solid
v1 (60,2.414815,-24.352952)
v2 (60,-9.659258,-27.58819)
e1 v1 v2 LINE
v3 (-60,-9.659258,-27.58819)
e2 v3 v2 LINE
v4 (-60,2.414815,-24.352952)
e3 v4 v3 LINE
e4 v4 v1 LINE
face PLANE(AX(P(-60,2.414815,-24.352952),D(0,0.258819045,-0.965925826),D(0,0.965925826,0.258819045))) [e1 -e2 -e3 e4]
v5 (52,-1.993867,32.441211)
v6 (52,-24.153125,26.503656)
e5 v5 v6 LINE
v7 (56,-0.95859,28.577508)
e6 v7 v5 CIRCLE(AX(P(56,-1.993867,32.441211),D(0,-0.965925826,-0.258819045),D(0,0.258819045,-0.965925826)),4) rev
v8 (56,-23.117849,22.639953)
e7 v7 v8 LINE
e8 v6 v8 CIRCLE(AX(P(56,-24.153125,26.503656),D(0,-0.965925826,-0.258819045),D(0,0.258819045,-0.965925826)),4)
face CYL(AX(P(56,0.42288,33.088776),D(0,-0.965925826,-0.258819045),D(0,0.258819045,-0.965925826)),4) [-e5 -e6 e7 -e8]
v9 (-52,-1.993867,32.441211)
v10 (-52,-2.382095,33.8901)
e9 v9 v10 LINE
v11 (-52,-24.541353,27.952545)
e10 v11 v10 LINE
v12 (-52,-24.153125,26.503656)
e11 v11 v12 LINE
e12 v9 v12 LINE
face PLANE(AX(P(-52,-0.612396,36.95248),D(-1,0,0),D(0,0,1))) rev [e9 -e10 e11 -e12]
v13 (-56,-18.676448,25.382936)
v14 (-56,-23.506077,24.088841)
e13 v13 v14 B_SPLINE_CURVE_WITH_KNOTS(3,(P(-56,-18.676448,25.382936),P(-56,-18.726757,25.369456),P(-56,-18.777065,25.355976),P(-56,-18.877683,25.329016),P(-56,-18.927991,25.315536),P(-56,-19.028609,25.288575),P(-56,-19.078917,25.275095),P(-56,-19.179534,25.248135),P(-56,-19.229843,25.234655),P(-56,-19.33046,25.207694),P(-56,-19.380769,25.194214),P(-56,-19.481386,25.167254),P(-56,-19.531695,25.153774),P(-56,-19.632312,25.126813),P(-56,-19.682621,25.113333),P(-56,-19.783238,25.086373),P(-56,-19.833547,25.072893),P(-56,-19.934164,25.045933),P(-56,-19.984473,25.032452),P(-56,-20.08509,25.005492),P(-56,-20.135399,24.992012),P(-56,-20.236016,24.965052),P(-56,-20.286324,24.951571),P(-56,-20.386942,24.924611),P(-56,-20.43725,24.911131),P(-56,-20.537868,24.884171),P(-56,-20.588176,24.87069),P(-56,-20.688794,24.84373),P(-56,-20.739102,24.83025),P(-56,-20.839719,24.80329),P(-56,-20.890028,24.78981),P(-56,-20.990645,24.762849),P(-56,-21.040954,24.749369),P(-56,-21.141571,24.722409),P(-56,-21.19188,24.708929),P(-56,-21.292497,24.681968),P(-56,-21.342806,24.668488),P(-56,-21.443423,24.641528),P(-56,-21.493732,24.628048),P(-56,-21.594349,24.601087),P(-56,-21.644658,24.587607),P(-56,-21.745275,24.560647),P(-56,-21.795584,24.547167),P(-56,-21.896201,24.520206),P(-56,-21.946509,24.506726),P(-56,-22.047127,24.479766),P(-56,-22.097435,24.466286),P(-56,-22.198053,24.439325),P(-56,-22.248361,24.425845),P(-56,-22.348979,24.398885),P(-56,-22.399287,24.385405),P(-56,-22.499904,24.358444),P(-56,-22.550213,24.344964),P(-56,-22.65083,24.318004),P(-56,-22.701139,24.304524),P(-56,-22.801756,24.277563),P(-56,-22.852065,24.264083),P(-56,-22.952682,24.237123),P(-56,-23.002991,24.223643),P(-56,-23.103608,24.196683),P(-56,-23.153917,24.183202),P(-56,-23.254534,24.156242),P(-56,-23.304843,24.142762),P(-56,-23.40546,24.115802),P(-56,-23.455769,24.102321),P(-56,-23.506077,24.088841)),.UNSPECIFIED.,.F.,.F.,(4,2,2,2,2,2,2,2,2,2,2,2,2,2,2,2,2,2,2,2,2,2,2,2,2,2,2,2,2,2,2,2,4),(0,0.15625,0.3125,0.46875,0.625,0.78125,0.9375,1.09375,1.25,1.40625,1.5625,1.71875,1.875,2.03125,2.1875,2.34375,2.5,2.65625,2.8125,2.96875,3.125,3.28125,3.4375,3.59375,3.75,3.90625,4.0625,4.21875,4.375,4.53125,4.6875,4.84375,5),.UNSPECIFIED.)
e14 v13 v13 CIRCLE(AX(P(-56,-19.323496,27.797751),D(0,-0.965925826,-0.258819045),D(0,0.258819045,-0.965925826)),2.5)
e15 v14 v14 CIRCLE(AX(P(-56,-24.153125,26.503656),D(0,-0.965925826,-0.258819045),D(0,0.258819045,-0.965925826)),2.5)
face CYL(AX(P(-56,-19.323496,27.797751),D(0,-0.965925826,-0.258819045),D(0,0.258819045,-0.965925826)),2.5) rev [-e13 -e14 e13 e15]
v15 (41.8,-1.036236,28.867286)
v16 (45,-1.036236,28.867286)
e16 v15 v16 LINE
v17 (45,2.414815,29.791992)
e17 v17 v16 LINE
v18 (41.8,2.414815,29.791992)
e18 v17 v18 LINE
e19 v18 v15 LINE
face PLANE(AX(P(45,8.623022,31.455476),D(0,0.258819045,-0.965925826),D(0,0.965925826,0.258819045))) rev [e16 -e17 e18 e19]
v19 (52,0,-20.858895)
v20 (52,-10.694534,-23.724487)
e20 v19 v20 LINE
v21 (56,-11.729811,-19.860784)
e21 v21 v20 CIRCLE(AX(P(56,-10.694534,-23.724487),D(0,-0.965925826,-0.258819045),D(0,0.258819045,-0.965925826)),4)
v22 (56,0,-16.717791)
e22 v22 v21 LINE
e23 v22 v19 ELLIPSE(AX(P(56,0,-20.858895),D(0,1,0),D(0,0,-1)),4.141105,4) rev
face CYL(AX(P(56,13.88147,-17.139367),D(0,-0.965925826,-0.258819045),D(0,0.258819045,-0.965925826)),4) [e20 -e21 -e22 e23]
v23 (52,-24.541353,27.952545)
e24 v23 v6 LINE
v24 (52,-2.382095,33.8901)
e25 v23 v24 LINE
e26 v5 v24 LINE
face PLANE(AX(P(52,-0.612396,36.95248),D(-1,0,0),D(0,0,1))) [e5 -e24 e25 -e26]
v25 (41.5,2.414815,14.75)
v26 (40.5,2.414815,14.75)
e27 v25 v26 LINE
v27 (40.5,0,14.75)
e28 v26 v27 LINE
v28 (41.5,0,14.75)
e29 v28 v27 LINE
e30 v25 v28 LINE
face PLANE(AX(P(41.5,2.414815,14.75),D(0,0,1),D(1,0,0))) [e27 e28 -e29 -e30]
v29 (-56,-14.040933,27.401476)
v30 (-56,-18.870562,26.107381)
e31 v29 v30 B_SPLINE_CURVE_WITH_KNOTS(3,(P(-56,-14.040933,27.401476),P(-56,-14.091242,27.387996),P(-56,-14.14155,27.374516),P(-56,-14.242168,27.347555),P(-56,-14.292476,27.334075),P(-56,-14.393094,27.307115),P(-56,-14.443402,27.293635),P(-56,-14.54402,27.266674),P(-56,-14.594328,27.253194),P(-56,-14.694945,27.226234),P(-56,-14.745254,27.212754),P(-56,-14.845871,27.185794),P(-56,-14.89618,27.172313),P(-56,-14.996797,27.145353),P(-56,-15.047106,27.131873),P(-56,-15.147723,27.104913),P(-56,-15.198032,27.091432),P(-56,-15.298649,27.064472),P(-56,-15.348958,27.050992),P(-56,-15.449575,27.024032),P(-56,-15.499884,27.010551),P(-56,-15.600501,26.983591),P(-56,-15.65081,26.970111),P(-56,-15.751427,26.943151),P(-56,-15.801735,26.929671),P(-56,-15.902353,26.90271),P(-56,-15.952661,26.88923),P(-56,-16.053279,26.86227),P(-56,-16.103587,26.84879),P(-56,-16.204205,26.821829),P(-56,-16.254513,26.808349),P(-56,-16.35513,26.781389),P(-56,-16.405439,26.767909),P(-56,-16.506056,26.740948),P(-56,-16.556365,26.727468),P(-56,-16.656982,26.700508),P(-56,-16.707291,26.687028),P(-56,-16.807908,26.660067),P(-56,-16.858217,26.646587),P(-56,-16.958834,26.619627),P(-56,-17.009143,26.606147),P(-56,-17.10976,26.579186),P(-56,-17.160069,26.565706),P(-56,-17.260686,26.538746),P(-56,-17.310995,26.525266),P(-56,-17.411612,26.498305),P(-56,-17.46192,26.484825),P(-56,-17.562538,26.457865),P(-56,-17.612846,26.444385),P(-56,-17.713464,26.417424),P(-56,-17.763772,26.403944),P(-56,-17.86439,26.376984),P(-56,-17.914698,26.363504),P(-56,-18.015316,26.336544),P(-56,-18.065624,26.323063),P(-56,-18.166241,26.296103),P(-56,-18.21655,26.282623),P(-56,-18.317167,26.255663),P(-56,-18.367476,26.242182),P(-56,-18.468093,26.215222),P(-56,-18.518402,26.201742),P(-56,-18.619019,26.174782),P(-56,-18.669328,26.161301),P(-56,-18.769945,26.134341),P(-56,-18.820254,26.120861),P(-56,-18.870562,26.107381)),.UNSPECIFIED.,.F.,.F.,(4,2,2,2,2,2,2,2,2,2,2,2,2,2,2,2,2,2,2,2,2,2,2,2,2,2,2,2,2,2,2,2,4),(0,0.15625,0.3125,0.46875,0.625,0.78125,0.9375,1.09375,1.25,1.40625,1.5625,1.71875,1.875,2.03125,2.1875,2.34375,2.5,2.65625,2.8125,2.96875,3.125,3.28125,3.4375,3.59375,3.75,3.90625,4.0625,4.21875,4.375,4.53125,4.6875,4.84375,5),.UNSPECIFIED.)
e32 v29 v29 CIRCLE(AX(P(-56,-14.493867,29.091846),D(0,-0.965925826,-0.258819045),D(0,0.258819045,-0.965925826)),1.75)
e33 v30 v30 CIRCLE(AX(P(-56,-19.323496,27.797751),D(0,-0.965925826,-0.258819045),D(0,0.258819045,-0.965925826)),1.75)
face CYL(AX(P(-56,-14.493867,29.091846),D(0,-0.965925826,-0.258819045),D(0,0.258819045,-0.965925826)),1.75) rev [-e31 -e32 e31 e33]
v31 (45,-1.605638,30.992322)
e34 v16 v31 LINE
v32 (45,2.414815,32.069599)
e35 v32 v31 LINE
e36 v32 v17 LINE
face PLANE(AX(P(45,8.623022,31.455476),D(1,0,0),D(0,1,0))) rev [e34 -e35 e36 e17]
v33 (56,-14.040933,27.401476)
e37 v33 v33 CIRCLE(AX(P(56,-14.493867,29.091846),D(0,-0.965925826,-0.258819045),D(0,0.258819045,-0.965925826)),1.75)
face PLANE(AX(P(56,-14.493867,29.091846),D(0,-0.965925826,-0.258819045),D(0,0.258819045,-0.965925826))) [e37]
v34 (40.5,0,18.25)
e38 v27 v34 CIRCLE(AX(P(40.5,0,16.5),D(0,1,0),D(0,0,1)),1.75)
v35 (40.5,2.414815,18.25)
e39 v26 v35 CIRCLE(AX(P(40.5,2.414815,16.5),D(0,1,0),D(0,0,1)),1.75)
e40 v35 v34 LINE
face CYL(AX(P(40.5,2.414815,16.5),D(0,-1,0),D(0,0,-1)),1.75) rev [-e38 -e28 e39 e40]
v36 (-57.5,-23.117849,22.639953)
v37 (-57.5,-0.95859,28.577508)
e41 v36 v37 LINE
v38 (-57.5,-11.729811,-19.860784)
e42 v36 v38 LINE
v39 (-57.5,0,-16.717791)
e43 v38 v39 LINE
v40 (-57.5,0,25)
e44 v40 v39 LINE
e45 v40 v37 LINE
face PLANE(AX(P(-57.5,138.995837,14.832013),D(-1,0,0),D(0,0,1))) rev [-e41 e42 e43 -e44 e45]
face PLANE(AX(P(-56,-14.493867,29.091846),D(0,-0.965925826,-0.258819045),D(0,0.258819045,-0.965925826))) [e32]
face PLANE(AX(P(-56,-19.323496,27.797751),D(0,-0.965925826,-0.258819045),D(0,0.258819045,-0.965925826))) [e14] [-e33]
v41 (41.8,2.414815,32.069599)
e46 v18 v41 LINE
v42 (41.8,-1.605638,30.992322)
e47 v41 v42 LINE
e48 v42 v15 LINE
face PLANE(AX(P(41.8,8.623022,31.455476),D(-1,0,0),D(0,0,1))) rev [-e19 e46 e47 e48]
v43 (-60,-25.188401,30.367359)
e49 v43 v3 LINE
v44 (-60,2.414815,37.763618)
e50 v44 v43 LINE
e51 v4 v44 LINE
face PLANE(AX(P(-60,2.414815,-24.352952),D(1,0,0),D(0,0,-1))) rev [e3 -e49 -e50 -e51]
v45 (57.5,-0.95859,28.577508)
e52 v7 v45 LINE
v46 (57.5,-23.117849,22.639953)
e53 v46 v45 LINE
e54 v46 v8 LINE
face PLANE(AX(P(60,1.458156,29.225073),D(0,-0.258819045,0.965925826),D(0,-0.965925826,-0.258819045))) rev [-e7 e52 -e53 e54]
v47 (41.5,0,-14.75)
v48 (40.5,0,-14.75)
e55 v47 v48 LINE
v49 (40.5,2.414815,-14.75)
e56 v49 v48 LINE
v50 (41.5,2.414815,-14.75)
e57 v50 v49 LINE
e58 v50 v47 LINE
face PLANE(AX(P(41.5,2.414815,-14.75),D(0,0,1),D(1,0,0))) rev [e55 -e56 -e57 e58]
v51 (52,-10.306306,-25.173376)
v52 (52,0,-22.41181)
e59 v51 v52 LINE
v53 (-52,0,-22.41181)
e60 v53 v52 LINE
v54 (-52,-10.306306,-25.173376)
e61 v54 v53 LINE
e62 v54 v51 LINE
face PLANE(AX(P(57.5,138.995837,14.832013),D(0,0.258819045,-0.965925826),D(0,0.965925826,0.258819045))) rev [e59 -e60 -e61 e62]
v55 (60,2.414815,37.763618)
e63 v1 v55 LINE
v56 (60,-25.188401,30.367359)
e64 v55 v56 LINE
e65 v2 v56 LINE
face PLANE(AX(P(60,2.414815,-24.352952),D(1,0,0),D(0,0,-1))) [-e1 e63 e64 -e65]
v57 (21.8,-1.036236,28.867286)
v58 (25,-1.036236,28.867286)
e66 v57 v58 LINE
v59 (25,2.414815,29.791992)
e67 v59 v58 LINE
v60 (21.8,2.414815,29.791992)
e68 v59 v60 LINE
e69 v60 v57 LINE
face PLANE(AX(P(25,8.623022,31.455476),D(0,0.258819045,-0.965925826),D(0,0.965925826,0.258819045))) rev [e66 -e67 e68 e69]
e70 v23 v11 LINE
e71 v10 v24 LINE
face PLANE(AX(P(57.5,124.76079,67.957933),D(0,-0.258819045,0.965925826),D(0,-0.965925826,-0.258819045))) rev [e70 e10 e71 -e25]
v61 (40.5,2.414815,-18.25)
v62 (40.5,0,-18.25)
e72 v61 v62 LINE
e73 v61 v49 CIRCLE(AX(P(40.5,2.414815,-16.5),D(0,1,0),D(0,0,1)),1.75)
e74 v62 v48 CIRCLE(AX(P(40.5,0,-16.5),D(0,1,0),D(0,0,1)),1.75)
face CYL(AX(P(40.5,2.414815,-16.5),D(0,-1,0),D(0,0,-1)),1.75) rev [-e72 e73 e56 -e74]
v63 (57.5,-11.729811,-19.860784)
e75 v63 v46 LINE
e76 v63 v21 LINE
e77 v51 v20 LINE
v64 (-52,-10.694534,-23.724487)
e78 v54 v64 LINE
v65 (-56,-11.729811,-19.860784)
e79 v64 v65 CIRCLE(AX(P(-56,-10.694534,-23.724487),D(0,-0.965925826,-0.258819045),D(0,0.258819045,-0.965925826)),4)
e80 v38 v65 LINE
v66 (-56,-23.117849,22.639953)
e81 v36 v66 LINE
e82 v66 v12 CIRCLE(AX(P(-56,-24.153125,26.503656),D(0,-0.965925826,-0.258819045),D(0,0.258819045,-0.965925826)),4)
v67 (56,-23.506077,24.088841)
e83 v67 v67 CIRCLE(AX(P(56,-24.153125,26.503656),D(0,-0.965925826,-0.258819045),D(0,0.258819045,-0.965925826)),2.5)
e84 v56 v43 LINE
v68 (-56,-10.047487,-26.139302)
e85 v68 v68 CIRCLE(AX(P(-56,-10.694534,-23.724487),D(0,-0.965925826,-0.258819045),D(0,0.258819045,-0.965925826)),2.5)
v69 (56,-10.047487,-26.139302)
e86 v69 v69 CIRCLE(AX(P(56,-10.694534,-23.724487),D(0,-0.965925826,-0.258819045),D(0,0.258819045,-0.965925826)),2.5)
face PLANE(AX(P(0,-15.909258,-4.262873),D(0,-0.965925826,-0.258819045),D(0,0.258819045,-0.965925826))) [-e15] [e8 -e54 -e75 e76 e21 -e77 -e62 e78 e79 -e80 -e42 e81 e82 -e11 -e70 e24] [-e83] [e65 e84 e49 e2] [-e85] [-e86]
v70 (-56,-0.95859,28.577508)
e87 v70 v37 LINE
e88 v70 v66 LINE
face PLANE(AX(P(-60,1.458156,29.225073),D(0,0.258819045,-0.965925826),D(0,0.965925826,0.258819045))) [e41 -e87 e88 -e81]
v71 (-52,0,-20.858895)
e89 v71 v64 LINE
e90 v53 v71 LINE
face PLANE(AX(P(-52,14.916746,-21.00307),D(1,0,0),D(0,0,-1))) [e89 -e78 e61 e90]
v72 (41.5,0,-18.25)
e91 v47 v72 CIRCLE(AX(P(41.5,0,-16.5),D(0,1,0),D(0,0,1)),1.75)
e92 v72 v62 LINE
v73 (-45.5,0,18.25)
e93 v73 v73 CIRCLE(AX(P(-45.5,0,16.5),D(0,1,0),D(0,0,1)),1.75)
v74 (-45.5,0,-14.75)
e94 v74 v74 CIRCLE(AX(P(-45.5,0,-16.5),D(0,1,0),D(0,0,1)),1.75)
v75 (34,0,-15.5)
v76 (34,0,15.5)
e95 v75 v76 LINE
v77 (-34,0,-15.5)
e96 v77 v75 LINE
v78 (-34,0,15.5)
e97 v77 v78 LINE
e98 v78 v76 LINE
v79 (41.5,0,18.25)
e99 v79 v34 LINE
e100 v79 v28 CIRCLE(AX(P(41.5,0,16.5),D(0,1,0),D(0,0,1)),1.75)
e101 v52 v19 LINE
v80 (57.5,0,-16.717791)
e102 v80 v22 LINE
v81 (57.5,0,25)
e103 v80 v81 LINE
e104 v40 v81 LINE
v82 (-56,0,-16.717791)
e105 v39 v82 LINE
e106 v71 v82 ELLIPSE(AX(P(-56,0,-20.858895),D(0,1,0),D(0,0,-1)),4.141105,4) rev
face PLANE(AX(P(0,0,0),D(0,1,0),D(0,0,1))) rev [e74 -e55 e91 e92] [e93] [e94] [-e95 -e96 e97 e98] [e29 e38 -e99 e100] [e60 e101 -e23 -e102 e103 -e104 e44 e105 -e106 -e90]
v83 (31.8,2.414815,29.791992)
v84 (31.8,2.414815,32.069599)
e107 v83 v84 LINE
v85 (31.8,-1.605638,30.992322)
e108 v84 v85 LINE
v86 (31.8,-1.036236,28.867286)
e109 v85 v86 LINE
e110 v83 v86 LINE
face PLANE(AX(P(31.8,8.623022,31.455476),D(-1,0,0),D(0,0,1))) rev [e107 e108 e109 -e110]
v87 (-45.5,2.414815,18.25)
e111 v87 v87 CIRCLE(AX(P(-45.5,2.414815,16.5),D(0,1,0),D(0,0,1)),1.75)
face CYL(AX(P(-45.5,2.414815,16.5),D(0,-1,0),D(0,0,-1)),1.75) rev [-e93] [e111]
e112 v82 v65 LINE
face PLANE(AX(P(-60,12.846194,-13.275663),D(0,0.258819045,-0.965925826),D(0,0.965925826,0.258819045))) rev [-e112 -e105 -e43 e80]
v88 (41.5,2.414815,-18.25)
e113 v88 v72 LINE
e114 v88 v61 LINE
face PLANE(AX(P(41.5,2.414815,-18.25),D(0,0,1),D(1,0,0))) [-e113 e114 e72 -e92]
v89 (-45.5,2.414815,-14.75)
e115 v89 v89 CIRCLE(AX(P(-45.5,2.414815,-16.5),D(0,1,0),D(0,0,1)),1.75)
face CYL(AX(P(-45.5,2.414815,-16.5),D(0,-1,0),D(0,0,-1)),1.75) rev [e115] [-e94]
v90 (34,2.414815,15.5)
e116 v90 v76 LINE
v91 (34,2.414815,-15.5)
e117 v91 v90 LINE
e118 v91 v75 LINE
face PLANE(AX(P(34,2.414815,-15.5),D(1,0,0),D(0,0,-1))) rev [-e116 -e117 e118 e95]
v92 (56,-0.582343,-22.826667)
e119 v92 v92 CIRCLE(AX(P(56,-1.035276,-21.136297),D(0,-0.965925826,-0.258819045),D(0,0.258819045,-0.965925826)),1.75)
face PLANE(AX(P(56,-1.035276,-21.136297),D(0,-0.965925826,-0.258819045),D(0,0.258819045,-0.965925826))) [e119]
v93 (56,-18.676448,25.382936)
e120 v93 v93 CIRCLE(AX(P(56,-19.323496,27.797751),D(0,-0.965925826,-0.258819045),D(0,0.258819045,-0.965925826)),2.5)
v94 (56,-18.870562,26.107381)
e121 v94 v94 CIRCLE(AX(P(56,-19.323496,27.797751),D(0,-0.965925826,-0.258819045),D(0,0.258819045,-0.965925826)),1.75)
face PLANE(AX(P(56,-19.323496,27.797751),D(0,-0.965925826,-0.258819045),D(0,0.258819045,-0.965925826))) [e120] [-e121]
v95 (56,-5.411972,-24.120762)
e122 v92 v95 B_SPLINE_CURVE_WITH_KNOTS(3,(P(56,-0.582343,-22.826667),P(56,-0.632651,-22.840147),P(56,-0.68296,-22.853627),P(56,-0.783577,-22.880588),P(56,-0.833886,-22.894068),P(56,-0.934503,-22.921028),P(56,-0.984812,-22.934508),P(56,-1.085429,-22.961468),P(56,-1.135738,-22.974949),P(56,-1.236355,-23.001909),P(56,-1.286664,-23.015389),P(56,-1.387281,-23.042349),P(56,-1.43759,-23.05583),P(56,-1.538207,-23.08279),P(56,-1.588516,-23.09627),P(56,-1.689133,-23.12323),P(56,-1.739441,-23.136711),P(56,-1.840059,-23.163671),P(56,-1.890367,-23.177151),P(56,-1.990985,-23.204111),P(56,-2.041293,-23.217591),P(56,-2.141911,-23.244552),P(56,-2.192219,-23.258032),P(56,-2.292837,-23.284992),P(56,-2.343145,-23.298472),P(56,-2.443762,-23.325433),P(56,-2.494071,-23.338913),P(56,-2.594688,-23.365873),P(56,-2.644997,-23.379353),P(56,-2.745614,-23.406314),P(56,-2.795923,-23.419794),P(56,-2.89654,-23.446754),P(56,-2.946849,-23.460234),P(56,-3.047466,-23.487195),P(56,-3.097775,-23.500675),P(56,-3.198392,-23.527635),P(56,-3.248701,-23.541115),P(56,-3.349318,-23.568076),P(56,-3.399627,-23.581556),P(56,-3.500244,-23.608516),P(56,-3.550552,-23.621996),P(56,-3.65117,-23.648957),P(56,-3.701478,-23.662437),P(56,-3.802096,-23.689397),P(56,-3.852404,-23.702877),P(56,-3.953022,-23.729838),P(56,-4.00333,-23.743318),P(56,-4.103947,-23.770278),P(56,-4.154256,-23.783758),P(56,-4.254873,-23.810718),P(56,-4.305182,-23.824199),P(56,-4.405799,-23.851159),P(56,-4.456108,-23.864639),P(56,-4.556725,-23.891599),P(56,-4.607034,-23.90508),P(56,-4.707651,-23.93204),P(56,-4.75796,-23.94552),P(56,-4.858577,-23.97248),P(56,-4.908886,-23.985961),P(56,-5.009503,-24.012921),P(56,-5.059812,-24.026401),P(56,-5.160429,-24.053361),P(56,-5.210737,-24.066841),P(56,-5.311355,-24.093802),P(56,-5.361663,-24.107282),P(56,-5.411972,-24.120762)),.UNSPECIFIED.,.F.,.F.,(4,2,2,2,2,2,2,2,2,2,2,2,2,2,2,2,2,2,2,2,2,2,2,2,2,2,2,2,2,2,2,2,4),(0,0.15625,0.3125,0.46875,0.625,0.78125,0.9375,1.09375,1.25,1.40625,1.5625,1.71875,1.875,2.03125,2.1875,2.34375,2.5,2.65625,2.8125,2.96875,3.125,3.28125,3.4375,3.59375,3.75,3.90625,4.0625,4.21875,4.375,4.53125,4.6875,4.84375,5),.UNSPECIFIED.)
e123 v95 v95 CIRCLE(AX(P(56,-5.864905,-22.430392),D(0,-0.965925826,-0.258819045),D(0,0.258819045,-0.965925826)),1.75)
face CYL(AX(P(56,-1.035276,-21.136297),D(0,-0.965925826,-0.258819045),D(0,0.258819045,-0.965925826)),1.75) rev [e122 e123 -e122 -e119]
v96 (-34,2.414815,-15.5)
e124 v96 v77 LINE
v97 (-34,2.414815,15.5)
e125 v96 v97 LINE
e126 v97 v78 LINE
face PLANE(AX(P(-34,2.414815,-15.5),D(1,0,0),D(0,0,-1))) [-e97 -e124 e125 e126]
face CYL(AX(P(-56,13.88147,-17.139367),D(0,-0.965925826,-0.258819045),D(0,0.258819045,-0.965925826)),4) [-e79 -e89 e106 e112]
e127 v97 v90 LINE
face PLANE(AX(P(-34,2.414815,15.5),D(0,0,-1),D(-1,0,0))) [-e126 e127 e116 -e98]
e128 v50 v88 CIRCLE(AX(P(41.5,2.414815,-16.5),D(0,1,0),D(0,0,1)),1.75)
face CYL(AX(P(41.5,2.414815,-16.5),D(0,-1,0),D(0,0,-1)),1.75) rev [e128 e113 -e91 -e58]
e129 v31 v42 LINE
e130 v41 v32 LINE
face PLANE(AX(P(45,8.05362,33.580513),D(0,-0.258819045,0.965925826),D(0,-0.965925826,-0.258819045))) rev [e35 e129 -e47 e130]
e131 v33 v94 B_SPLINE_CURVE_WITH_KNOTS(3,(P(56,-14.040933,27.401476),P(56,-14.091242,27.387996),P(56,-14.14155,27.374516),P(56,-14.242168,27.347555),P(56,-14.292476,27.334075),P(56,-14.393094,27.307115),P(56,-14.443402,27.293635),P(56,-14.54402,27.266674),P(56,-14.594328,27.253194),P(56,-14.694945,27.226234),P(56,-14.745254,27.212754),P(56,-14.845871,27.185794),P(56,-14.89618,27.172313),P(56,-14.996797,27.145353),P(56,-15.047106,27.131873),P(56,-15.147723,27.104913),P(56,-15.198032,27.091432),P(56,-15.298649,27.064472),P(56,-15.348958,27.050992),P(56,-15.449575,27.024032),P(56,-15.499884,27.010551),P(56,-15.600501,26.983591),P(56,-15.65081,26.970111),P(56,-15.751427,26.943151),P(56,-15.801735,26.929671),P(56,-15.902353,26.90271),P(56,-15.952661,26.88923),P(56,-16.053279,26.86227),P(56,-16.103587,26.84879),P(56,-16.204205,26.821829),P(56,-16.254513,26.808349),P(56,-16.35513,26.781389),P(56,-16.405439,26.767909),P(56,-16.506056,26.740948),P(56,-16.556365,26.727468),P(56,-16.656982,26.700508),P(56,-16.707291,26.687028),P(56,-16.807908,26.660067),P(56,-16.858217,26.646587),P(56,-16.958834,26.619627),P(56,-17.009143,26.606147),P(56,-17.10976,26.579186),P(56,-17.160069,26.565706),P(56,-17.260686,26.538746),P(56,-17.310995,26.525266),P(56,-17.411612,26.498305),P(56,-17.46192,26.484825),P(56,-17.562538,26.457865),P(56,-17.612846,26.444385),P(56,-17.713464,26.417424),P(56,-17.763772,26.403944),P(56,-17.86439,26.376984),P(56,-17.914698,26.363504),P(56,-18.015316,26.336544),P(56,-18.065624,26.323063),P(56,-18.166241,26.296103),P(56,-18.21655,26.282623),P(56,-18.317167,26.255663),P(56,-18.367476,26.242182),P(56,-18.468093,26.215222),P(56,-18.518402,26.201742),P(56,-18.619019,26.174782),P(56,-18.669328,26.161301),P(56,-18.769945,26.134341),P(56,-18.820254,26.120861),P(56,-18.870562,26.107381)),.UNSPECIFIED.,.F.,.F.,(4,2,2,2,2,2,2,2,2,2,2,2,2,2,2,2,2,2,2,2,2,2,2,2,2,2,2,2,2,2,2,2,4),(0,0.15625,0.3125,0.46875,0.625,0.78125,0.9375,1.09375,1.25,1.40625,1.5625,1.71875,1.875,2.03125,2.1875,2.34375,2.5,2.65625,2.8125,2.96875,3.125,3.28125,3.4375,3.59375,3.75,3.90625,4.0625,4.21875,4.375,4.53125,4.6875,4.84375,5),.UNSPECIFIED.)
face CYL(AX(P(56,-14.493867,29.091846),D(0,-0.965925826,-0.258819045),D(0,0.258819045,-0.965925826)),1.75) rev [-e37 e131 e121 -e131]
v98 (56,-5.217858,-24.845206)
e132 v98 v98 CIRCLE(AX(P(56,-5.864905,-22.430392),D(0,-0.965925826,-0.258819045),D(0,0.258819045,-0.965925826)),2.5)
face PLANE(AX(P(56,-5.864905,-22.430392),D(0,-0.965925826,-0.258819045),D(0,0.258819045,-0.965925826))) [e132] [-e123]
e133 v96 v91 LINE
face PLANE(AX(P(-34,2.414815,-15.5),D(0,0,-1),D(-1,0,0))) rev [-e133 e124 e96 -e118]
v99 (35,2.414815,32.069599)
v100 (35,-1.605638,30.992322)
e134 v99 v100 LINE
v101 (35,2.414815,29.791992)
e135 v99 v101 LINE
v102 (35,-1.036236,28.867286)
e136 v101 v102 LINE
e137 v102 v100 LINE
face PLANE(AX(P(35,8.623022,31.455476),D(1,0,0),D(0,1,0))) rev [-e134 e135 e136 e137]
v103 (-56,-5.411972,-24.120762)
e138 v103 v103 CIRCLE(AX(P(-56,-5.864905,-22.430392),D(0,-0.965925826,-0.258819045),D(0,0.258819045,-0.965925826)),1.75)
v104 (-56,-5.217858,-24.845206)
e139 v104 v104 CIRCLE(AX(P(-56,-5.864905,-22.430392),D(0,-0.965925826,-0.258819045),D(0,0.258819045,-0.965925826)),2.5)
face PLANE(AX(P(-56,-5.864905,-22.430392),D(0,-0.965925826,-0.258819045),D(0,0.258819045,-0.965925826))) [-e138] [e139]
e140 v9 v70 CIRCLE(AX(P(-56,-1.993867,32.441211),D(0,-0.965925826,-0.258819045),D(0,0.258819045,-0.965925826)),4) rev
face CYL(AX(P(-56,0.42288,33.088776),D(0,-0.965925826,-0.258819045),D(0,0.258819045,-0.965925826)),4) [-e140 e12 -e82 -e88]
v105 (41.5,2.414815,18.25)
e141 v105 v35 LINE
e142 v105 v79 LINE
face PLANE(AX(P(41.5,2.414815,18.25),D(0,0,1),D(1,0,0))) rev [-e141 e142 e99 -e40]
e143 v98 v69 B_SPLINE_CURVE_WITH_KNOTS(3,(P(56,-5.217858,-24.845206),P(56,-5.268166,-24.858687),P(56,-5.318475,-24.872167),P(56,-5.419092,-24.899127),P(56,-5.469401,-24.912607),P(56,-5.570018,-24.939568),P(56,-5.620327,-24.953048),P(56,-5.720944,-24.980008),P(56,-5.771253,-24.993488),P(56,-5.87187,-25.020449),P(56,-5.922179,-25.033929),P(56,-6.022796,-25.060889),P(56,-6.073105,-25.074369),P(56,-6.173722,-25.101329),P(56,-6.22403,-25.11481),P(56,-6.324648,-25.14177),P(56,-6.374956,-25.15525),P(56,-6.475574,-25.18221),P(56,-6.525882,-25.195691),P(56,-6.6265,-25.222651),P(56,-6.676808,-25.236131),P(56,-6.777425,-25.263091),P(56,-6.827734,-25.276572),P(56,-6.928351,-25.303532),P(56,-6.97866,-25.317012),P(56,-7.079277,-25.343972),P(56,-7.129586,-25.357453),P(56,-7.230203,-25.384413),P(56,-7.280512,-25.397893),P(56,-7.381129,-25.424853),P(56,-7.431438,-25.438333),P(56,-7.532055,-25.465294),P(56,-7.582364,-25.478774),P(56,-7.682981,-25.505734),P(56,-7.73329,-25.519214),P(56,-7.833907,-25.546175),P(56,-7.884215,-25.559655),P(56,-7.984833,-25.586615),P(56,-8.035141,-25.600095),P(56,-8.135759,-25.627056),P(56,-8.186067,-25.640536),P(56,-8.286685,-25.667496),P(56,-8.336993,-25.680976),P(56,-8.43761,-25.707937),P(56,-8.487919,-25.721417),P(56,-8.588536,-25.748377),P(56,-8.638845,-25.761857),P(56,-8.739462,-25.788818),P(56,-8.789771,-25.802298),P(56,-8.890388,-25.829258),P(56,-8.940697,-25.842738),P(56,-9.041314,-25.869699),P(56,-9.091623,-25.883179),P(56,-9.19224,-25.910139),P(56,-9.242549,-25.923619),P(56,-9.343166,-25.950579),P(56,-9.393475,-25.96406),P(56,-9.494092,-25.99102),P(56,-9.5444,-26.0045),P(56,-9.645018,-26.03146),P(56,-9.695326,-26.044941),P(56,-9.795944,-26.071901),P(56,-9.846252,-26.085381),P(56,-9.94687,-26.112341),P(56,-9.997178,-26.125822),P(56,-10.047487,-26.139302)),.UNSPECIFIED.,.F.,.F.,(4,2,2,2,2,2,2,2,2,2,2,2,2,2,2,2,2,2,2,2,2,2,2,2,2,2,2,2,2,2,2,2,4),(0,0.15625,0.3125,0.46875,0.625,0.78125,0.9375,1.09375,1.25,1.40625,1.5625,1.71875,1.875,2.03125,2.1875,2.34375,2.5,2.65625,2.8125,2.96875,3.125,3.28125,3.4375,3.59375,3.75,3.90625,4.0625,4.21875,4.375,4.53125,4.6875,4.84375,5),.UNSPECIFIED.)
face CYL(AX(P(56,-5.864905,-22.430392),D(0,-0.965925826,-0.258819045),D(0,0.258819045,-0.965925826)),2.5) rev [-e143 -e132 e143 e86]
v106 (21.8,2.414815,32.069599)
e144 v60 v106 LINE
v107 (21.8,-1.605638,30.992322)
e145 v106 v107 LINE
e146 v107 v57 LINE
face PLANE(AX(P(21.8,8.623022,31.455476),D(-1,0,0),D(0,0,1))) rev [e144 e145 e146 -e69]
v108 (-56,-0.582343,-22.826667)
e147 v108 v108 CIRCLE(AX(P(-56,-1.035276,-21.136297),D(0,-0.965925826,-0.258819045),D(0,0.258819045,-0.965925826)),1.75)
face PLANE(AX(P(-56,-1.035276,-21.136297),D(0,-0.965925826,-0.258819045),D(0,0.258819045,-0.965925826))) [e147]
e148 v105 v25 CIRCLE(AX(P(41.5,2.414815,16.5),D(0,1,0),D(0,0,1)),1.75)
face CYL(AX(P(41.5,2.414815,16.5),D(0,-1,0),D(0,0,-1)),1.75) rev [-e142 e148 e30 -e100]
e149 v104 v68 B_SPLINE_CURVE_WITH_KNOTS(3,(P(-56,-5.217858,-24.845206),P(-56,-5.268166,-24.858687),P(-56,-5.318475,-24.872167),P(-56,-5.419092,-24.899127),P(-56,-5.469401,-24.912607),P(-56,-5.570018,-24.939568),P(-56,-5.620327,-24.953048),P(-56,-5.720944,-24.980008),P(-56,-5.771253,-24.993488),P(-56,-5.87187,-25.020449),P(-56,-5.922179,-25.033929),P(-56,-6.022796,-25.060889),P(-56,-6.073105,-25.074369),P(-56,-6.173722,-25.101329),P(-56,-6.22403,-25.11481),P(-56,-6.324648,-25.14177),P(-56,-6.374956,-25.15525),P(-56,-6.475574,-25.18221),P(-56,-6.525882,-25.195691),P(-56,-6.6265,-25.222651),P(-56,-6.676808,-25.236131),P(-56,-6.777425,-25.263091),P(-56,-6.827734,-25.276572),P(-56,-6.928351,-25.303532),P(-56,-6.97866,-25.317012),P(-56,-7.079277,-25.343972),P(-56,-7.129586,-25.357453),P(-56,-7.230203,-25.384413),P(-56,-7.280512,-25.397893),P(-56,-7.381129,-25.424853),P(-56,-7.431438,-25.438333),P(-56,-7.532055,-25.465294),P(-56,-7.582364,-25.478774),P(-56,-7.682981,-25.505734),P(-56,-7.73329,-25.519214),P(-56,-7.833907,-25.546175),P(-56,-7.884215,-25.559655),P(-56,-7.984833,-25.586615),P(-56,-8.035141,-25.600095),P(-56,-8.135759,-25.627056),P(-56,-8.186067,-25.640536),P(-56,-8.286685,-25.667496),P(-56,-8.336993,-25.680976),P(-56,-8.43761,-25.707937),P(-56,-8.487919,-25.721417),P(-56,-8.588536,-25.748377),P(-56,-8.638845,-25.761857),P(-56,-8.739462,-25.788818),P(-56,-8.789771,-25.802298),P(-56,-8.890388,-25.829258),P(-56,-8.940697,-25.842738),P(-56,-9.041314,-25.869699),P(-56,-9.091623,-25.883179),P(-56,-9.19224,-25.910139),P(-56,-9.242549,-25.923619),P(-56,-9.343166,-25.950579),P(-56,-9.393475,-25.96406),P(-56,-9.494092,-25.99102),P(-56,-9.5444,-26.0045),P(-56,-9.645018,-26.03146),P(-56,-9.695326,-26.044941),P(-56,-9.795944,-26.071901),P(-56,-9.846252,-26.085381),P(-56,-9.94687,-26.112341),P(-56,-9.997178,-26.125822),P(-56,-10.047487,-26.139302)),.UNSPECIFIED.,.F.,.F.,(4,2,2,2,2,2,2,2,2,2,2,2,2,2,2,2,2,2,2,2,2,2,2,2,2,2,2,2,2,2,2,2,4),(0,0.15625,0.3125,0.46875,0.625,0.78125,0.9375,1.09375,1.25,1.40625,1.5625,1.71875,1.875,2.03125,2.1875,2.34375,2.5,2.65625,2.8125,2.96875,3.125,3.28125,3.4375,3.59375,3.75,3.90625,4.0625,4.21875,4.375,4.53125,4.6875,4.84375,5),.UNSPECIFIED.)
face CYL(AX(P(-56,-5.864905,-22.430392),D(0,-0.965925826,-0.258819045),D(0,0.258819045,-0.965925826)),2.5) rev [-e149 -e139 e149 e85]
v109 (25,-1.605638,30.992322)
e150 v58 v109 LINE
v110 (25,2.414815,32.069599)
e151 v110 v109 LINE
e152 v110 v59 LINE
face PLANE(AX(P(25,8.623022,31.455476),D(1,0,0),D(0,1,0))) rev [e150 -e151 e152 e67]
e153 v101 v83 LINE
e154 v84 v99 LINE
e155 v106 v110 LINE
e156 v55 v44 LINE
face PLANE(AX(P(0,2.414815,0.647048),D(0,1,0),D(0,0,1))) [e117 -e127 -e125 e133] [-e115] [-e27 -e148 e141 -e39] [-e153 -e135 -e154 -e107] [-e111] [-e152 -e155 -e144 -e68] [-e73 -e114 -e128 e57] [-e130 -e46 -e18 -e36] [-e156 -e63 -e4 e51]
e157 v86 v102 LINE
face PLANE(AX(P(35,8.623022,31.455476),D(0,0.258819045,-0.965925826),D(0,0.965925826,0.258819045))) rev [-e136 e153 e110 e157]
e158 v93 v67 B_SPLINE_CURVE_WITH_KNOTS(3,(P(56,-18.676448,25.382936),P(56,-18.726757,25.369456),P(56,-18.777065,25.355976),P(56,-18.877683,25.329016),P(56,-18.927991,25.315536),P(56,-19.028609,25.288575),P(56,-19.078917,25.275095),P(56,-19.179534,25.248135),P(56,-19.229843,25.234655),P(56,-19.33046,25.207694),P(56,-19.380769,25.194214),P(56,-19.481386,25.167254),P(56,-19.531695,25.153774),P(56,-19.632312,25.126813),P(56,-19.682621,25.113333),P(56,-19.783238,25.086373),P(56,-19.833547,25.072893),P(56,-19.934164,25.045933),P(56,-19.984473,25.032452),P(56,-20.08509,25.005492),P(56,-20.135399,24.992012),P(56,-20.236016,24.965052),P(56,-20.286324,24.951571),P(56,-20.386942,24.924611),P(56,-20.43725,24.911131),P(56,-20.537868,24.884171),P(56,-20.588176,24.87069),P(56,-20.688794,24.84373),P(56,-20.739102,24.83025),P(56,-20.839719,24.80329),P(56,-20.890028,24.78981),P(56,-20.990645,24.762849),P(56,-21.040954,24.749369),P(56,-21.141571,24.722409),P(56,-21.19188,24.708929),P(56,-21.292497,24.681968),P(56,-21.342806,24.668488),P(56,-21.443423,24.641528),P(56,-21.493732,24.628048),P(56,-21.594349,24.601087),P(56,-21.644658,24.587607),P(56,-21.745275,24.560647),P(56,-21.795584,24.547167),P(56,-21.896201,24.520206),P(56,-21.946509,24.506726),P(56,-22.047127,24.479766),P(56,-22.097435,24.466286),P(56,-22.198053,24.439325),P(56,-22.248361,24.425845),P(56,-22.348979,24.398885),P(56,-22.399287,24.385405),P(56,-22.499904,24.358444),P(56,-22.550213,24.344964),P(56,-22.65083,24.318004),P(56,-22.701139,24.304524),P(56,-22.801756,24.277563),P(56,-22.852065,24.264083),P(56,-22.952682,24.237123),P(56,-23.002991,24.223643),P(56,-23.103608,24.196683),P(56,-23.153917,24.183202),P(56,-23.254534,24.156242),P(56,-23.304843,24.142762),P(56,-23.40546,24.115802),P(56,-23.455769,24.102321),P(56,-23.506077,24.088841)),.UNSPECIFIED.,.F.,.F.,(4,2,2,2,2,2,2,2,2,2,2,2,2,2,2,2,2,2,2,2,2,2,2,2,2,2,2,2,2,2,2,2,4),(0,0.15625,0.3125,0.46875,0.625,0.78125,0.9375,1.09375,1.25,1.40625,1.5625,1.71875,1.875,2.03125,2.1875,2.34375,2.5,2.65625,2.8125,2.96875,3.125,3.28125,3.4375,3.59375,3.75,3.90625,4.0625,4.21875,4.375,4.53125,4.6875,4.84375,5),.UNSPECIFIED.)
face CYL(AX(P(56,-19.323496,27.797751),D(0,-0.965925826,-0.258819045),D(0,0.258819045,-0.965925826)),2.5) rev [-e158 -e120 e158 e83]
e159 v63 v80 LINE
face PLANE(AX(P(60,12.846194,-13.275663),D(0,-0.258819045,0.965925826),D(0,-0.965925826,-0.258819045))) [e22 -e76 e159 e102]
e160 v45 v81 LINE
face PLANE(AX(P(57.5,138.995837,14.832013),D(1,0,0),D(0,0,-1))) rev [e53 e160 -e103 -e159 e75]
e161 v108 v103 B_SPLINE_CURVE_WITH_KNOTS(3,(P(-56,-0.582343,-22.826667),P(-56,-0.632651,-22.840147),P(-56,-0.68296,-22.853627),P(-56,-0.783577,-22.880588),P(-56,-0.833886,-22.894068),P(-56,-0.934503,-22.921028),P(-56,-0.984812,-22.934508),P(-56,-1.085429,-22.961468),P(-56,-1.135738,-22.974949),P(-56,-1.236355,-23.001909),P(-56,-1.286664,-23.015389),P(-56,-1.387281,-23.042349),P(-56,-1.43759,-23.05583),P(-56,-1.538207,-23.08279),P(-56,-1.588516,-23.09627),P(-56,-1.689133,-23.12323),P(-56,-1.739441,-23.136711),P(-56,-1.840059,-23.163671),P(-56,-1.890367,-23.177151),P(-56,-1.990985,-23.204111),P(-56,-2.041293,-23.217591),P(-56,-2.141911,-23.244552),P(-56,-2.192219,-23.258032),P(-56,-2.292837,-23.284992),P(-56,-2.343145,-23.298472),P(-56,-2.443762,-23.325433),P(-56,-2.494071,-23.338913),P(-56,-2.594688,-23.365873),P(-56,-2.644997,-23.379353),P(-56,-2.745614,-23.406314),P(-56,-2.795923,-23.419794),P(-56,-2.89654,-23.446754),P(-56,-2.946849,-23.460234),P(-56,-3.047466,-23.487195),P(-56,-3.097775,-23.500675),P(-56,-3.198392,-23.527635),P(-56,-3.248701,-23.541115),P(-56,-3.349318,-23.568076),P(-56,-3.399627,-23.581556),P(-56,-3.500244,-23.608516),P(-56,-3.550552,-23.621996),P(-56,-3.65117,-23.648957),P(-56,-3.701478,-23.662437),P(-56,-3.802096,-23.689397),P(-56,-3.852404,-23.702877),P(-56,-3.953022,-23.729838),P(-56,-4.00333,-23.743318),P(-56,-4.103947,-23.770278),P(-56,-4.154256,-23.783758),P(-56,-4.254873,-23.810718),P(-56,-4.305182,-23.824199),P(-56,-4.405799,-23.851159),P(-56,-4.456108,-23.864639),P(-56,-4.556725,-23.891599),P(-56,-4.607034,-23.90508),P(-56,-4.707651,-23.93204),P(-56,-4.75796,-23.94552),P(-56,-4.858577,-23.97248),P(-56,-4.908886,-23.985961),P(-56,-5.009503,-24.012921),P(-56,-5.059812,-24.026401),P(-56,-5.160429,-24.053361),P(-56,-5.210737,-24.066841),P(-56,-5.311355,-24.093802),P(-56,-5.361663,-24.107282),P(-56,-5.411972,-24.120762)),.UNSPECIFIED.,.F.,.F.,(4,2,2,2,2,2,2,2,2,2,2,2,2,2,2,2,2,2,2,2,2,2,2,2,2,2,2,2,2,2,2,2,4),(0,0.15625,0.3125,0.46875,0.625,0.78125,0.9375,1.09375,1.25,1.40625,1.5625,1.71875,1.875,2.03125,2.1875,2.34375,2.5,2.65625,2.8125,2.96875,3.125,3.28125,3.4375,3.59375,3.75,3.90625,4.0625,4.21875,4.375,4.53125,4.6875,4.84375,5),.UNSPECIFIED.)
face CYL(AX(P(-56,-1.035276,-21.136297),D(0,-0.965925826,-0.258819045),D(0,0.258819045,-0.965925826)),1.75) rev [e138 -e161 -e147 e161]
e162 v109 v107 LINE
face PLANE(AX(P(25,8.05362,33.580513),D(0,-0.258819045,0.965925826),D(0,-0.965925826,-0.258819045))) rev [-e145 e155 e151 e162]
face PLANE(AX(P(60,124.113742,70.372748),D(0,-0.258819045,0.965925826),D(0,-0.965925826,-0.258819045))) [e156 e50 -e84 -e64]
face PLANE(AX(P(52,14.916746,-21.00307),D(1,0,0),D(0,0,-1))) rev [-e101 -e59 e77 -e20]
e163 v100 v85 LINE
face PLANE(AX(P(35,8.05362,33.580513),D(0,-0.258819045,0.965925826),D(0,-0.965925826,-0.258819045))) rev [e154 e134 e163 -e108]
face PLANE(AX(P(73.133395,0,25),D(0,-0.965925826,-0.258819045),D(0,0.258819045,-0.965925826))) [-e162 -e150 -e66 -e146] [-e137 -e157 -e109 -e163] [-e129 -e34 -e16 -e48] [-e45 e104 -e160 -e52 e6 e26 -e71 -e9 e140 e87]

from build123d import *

# Parameters (mm, degrees)
SKETCH_1_W               = 120
SKETCH_1_H               = 50
EXTRUDE_2_DEPTH          = 2.5
SKETCH_1_3_R             = 1.75
SKETCH_1_3_W             = 68
SKETCH_1_3_H             = 31
CUT_EXTRUDE_1_DEPTH      = 66.296266207
EXTRUDE_START            = -60
EXTRUDE_3_DEPTH          = 120
EXTRUDE_3_2_DEPTH        = 2.5
EXTRUDE_START_2          = 57.5
EXTRUDE_3_3_DEPTH        = 2.5
CUT_EXTRUDE_2_DEPTH      = 129.109700543
CUT_EXTRUDE_2_DEPTH_BACK = 129.109700543
EXTRUDE_4_DEPTH          = 120
EXTRUDE_5_REACH          = 77.063
EXTRUDE_6_REACH          = 77.063
SKETCH_7_R               = 2.5
CUT_EXTRUDE_3_DEPTH      = 5
SKETCH_8_R               = 1.75
CUT_EXTRUDE_4_DEPTH      = 5
EXTRUDE_8_DEPTH          = 120
SKETCH_10_W              = 3.2
SKETCH_10_H              = 2.2
CUT_EXTRUDE_5_DEPTH      = 10


# Read off the part's stored shape, not the designer's step: 凸台-拉伸3
with BuildPart() as part:
    # 草图1 → 凸台-拉伸2 (new, along a direction that is not the sketch's normal)
    with BuildSketch(Plane(origin=(0, 0, 0), x_dir=(1, 0, 0), z_dir=(0, 1, 0))):
        Rectangle(SKETCH_1_W, SKETCH_1_H)
    extrude(amount=EXTRUDE_2_DEPTH, dir=(0, 0.9659258262890672, 0.2588190451025249))

    # 草图1<3> → 切除-拉伸1 (cut, through all)
    with BuildSketch(Plane(origin=(0, 0, 0), x_dir=(1, 0, 0), z_dir=(0, 1, 0))):
        with Locations(Location((-45.5, 16.5, 0), (0, 0, 270))):
            Circle(SKETCH_1_3_R)
        with Locations(Location((-45.5, -16.5, 0), (0, 0, 270))):
            Circle(SKETCH_1_3_R)
        Rectangle(SKETCH_1_3_W, SKETCH_1_3_H)
        with BuildLine():
            Line((41.5, 18.25), (40.5, 18.25))
            ThreePointArc((40.5, 18.25), (38.75, 16.5), (40.5, 14.75))
            Line((40.5, 14.75), (41.5, 14.75))
            ThreePointArc((41.5, 14.75), (43.25, 16.5), (41.5, 18.25))
        make_face()
        with BuildLine():
            Line((41.5, -18.25), (40.5, -18.25))
            ThreePointArc((40.5, -18.25), (38.75, -16.5), (40.5, -14.75))
            Line((40.5, -14.75), (41.5, -14.75))
            ThreePointArc((41.5, -14.75), (43.25, -16.5), (41.5, -18.25))
        make_face()
    extrude(amount=CUT_EXTRUDE_1_DEPTH, mode=Mode.SUBTRACT)

    # 凸台-拉伸3 outline → 凸台-拉伸3 (add)
    with BuildSketch(Plane.YZ.offset(EXTRUDE_START)):
        Polygon((-10.306305876, -25.173375885), (-9.659258263, -27.588190451), (0, -25), (0, -22.411809549), align=None)
        Polygon((-25.188400969, 30.367359126), (-24.541353356, 27.952544561), (0, 34.528380374), (0, 37.116570825), align=None)
    extrude(amount=EXTRUDE_3_DEPTH)

    # Extrude 3 2 outline → Extrude 3 2 (add)
    with BuildSketch(Plane.YZ.offset(EXTRUDE_START)):
        Polygon((-24.541353356, 27.952544561), (-10.306305876, -25.173375885), (0, -22.411809549), (0, 34.528380374), align=None)
    extrude(amount=EXTRUDE_3_2_DEPTH)

    # Extrude 3 3 outline → Extrude 3 3 (add)
    with BuildSketch(Plane.YZ.offset(EXTRUDE_START_2)):
        Polygon((-24.541353356, 27.952544561), (-10.306305876, -25.173375885), (0, -22.411809549), (0, 34.528380374), align=None)
    extrude(amount=EXTRUDE_3_3_DEPTH)

    # 草图4 → 切除-拉伸2 (cut, two sides: drawn at the far end of the back side and taken through both)
    with BuildSketch(Plane.ZY.offset(60).offset(-CUT_EXTRUDE_2_DEPTH_BACK)):
        Polygon((25.647047613, 2.414814566), (36.951962095, -0.61432814), (37.116570825, 0), align=None)
    extrude(amount=CUT_EXTRUDE_2_DEPTH + CUT_EXTRUDE_2_DEPTH_BACK, mode=Mode.SUBTRACT)

    # 草图5 → 凸台-拉伸4 (add)
    with BuildSketch(Plane.ZY.offset(60)):
        Polygon((25.647047613, 2.414814566), (36.951962095, -0.61432814), (36.304914483, -3.029142706), (25, 0), align=None)
    extrude(amount=-EXTRUDE_4_DEPTH)

    # 凸台-拉伸5: up to this plane
    extrude_5_end = Plane(origin=(0, 0, 0), z_dir=(0, 1, 0))
    # 草图6 → 凸台-拉伸5 (add, up to the surface)
    with BuildSketch(Plane(origin=(0, -15.909258263, -4.262872904), x_dir=(1, 0, 0), z_dir=(0, -0.9659258262890672, -0.25881904510252496)), mode=Mode.PRIVATE) as extrude_5_sk1:
        with BuildLine():
            Line((-60, -24.148145657), (-52, -24.148145657))
            Line((-52, -24.148145657), (-52, -20.148145657))
            ThreePointArc((-52, -20.148145657), (-53.171572875, -17.319718532), (-56, -16.148145657))
            Line((-56, -16.148145657), (-60, -16.148145657))
            Line((-60, -16.148145657), (-60, -24.148145657))
        make_face()
    extrude_5_tool1 = split(extrude(extrude_5_sk1.sketch, amount=-EXTRUDE_5_REACH, mode=Mode.PRIVATE), bisect_by=extrude_5_end, keep=Keep.BOTH, mode=Mode.PRIVATE)
    add(extrude_5_tool1.solids().sort_by_distance((-56.176115, -10.648952, -23.894601))[0])
    # 草图6 → 凸台-拉伸5 (add, up to the surface)
    with BuildSketch(Plane(origin=(0, -15.909258263, -4.262872904), x_dir=(1, 0, 0), z_dir=(0, -0.9659258262890672, -0.25881904510252496)), mode=Mode.PRIVATE) as extrude_5_sk2:
        with BuildLine():
            Line((60, -24.148145657), (52, -24.148145657))
            Line((52, -24.148145657), (52, -20.148145657))
            ThreePointArc((52, -20.148145657), (53.171572875, -17.319718532), (56, -16.148145657))
            Line((56, -16.148145657), (60, -16.148145657))
            Line((60, -16.148145657), (60, -24.148145657))
        make_face()
    extrude_5_tool2 = split(extrude(extrude_5_sk2.sketch, amount=-EXTRUDE_5_REACH, mode=Mode.PRIVATE), bisect_by=extrude_5_end, keep=Keep.BOTH, mode=Mode.PRIVATE)
    add(extrude_5_tool2.solids().sort_by_distance((56.176115, -10.648952, -23.894601))[0])

    # 草图6<4> → 凸台-拉伸6 (add, up to next)
    with BuildSketch(Plane(origin=(0, -15.909258263, -4.262872904), x_dir=(1, 0, 0), z_dir=(0, -0.9659258262890672, -0.25881904510252496)), mode=Mode.PRIVATE) as extrude_6_sk1:
        with BuildLine():
            Line((-60, 35.851854343), (-52, 35.851854343))
            Line((-52, 35.851854343), (-52, 31.851854343))
            ThreePointArc((-52, 31.851854343), (-53.171572875, 29.023427218), (-56, 27.851854343))
            Line((-56, 27.851854343), (-60, 27.851854343))
            Line((-60, 27.851854343), (-60, 35.851854343))
        make_face()
    extrude_6_tool1 = extrude(extrude_6_sk1.sketch, amount=-EXTRUDE_6_REACH, mode=Mode.PRIVATE) - part.part
    # 草图6<4> → 凸台-拉伸6 (add, up to next)
    with BuildSketch(Plane(origin=(0, -15.909258263, -4.262872904), x_dir=(1, 0, 0), z_dir=(0, -0.9659258262890672, -0.25881904510252496)), mode=Mode.PRIVATE) as extrude_6_sk2:
        with BuildLine():
            Line((60, 35.851854343), (52, 35.851854343))
            Line((52, 35.851854343), (52, 31.851854343))
            ThreePointArc((52, 31.851854343), (53.171572875, 29.023427218), (56, 27.851854343))
            Line((56, 27.851854343), (60, 27.851854343))
            Line((60, 27.851854343), (60, 35.851854343))
        make_face()
    extrude_6_tool2 = extrude(extrude_6_sk2.sketch, amount=-EXTRUDE_6_REACH, mode=Mode.PRIVATE) - part.part
    add(extrude_6_tool1.solids().sort_by_distance((-56.176115, -24.198707, 26.67377))[0])
    add(extrude_6_tool2.solids().sort_by_distance((56.176115, -24.198707, 26.67377))[0])

    # 草图7 → 切除-拉伸3 (cut)
    with BuildSketch(Plane(origin=(0, -15.909258263, -4.262872904), x_dir=(1, 0, 0), z_dir=(0, -0.9659258262890672, -0.25881904510252496))):
        with Locations(Location((-56, 31.851854343, 0), (0, 0, 270))):
            Circle(SKETCH_7_R)
        with Locations(Location((-56, -20.148145657, 0), (0, 0, 270))):
            Circle(SKETCH_7_R)
        with Locations(Location((56, -20.148145657, 0), (0, 0, 270))):
            Circle(SKETCH_7_R)
        with Locations(Location((56, 31.851854343, 0), (0, 0, 270))):
            Circle(SKETCH_7_R)
    extrude(amount=-CUT_EXTRUDE_3_DEPTH, mode=Mode.SUBTRACT)

    # 草图8 → 切除-拉伸4 (cut)
    with BuildSketch(Plane(origin=(0, -11.079629131, -2.968777678), x_dir=(1, 0, 0), z_dir=(0, -0.9659258262890672, -0.25881904510252496))):
        with Locations(Location((-56, 31.851854343, 0), (0, 0, 270))):
            Circle(SKETCH_8_R)
        with Locations(Location((-56, -20.148145657, 0), (0, 0, 270))):
            Circle(SKETCH_8_R)
        with Locations(Location((56, -20.148145657, 0), (0, 0, 270))):
            Circle(SKETCH_8_R)
        with Locations(Location((56, 31.851854343, 0), (0, 0, 270))):
            Circle(SKETCH_8_R)
    extrude(amount=-CUT_EXTRUDE_4_DEPTH, mode=Mode.SUBTRACT)

    # 草图11 → 凸台-拉伸8 (add)
    with BuildSketch(Plane.ZY.offset(60)):
        Polygon((25.647047613, 2.414814566), (37.763618437, 2.414814566), (36.951962095, -0.61432814), align=None)
    extrude(amount=-EXTRUDE_8_DEPTH)

    # 草图10 → 切除-拉伸5 (cut)
    with BuildSketch(Plane(origin=(0, 6.25, 1.674682453), x_dir=(1, 0, 0), z_dir=(0, -0.9659258262890672, -0.25881904510252524))):
        with Locations((33.4, 29.251854343)):
            Rectangle(SKETCH_10_W, SKETCH_10_H)
        with Locations((43.4, 29.251854343)):
            Rectangle(SKETCH_10_W, SKETCH_10_H)
        with Locations((23.4, 29.251854343)):
            Rectangle(SKETCH_10_W, SKETCH_10_H)
    extrude(amount=-CUT_EXTRUDE_5_DEPTH, mode=Mode.SUBTRACT)


solid = part.part
